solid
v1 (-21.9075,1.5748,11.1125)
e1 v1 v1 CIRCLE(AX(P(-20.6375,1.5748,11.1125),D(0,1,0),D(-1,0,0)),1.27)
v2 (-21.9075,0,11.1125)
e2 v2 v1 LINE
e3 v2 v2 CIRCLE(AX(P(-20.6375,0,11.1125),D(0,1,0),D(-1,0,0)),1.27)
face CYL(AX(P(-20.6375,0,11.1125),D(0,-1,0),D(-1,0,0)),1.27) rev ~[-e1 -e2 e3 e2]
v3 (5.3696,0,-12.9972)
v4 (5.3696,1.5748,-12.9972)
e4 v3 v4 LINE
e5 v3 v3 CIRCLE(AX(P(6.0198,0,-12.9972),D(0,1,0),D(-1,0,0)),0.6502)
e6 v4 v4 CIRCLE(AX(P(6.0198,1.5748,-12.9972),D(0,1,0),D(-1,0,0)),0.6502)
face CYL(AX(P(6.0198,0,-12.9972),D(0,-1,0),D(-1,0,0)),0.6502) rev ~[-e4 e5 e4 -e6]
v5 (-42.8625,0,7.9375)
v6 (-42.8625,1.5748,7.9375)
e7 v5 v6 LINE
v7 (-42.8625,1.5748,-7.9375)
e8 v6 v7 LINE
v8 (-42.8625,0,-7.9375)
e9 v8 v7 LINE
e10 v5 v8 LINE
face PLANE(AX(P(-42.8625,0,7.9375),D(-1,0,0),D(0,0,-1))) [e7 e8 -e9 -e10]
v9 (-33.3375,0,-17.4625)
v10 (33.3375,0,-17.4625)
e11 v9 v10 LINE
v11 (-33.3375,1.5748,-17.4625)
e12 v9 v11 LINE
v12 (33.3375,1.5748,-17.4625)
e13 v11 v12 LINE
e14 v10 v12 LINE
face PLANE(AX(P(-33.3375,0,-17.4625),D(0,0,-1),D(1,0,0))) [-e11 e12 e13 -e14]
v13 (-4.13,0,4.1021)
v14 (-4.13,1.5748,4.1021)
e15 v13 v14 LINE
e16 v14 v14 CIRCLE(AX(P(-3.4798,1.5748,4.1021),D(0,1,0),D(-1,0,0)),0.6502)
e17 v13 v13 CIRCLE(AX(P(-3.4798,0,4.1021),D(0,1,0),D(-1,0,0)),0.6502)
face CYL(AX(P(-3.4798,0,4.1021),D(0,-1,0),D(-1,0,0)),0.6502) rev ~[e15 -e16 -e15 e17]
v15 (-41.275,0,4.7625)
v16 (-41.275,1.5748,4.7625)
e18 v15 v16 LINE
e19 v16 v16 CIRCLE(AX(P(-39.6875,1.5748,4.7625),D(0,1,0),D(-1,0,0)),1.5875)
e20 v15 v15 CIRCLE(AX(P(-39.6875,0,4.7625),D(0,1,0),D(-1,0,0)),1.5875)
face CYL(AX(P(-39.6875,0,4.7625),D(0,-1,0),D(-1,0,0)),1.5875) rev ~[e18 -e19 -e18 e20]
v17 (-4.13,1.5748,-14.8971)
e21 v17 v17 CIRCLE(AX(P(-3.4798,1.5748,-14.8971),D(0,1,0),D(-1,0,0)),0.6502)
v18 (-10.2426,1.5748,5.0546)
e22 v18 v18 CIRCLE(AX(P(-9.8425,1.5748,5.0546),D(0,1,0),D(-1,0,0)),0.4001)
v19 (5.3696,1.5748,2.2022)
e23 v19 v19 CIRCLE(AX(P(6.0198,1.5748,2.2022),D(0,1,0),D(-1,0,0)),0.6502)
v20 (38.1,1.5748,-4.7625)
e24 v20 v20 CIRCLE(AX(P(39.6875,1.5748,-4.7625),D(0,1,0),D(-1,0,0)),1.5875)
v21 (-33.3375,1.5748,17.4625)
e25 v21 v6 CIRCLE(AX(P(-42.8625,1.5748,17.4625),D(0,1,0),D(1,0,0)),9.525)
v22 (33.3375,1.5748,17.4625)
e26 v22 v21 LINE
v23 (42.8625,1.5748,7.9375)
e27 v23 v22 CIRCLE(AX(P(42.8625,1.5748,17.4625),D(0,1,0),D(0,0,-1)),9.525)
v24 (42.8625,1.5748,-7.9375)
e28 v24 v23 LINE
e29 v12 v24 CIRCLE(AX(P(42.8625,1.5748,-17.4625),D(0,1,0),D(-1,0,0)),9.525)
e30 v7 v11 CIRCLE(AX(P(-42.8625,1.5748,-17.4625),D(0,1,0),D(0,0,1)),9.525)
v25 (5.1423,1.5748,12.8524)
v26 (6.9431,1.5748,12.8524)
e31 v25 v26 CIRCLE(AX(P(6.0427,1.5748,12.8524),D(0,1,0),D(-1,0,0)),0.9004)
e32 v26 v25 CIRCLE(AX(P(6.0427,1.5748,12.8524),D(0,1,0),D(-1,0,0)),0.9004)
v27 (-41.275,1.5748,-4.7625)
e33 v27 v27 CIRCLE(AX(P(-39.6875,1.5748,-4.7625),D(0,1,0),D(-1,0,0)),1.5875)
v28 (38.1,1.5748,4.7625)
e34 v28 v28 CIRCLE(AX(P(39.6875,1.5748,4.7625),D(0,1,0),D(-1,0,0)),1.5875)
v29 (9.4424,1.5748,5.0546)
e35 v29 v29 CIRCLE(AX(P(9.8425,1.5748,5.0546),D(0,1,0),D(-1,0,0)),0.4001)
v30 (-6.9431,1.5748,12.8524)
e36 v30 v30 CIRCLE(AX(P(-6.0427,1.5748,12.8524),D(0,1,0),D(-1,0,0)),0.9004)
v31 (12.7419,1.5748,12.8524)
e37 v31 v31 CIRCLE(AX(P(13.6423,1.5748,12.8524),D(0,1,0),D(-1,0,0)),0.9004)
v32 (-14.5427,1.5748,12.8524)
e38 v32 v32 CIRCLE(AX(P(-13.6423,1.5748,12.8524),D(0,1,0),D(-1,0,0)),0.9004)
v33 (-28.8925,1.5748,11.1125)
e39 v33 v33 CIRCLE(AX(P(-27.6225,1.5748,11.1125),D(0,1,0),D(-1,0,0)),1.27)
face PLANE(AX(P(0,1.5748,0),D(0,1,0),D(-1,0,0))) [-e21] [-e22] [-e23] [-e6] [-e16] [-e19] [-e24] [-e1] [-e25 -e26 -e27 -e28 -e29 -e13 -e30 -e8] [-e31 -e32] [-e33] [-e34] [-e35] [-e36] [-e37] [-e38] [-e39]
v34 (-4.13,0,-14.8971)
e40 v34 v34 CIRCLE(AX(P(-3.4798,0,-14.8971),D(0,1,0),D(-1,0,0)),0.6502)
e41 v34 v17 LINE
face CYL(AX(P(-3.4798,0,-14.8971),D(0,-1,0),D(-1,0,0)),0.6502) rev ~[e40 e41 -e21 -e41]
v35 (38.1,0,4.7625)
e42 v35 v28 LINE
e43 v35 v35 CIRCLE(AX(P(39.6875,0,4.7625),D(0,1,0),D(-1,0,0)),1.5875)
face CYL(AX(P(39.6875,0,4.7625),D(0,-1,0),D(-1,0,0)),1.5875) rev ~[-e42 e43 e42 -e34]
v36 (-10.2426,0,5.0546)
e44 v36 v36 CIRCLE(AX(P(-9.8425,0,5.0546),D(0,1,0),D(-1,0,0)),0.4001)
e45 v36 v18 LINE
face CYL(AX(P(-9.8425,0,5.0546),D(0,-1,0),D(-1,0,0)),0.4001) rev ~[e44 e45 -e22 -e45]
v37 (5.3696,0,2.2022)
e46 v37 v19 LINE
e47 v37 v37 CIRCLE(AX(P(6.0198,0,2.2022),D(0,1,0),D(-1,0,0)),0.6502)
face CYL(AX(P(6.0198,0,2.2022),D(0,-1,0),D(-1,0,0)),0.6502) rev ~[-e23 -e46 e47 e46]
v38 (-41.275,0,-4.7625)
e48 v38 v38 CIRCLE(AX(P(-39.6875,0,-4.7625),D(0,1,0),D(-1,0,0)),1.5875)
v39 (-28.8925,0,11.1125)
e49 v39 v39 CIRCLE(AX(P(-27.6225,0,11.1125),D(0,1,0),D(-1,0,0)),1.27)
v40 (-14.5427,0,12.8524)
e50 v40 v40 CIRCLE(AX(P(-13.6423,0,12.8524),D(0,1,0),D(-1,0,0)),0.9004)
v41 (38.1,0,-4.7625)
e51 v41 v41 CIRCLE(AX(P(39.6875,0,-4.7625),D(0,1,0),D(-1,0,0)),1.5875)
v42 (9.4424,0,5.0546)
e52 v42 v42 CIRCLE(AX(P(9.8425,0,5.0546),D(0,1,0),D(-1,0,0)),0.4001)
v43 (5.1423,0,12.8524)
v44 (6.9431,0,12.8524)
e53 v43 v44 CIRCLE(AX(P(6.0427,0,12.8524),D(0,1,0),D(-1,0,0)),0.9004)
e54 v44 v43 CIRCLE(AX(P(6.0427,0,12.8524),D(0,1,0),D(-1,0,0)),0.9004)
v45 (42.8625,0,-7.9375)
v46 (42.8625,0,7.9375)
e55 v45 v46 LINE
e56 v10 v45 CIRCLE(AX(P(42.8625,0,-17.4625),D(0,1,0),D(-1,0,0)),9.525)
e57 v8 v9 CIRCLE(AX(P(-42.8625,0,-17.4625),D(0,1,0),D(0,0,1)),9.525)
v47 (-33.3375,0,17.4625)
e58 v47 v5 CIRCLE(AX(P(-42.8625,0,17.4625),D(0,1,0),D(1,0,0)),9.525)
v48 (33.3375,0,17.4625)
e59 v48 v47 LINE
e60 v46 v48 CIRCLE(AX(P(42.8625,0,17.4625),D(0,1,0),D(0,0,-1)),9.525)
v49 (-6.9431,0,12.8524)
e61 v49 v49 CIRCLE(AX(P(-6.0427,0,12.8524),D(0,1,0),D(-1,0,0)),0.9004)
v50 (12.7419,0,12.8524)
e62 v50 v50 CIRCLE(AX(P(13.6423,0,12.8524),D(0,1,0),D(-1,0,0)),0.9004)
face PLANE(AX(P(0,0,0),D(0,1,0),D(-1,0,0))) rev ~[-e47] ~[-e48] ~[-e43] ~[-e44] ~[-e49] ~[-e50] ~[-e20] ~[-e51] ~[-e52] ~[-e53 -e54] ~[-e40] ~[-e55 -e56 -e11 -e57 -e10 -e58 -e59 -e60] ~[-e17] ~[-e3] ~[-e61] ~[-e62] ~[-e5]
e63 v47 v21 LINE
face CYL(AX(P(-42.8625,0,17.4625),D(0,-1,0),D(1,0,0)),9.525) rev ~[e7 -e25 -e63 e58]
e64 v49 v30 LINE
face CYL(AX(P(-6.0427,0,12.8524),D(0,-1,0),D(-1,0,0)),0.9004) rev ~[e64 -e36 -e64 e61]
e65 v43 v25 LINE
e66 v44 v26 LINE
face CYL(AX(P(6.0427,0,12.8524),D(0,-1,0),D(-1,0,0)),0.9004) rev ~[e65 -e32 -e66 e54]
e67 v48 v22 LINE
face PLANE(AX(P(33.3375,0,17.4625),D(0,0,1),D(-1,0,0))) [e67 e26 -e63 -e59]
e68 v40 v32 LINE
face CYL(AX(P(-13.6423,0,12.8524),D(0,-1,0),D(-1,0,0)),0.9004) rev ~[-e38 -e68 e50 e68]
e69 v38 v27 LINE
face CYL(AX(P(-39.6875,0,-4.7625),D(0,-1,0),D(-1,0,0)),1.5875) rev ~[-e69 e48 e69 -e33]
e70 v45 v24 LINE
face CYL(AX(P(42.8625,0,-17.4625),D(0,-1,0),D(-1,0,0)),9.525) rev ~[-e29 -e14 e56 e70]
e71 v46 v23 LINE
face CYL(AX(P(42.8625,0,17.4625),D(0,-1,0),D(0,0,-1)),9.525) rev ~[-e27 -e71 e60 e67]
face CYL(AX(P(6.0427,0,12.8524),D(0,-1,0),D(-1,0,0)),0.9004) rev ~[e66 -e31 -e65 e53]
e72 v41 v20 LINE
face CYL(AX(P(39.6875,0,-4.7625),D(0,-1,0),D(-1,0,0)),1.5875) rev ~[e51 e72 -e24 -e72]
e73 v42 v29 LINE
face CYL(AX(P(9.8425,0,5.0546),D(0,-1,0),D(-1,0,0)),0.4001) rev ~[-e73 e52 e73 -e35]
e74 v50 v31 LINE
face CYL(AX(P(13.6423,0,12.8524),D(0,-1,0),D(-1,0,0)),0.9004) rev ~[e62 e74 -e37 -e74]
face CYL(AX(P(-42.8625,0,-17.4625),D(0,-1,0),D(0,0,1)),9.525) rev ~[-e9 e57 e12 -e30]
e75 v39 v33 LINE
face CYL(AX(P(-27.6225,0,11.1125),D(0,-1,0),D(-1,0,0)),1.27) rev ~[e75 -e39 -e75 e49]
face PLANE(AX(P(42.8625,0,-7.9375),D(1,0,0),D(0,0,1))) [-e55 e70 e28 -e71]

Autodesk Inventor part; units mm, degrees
ref_plane "YZ Plane" through (0, 0, 0) normal (1, 0, 0) x (0, 1, 0)
ref_plane "XZ Plane" through (0, 0, 0) normal (0, 1, 0) x (-1, 0, 0)
ref_plane "XY Plane" through (0, 0, 0) normal (0, 0, 1) x (1, 0, 0)
sketch "Sketch1" plane through (0, 0, 0) normal (0, 1, 0) x (-1, 0, 0)
  line L0 (-33.3375, 17.4625) -> (33.3375, 17.4625)
  line L1 (42.8625, 7.9375) -> (42.8625, -7.9375)
  line L2 (33.3375, -17.4625) -> (-33.3375, -17.4625)
  line L3 (-42.8625, -7.9375) -> (-42.8625, 7.9375)
  arc A0 (-42.8625, 7.9375) -> (-33.3375, 17.4625) centre (-42.8625, 17.4625) ccw
  arc A1 (-33.3375, -17.4625) -> (-42.8625, -7.9375) centre (-42.8625, -17.4625) ccw
  arc A2 (42.8625, -7.9375) -> (33.3375, -17.4625) centre (42.8625, -17.4625) ccw
  arc A3 (33.3375, 17.4625) -> (42.8625, 7.9375) centre (42.8625, 17.4625) ccw
  circle A4 centre (-39.6875, -4.7625) radius 1.5875
  line L4 (0, 15.213) -> (0, -8.9791)
  circle A5 centre (39.6875, -4.7625) radius 1.5875
  line L5 (-13.6455, 0) -> (11.519, 0)
  circle A6 centre (-39.6875, 4.7625) radius 1.5875
  circle A7 centre (39.6875, 4.7625) radius 1.5875
  line L6 (-42.8625, -13.6689) -> (-42.8625, -17.4625)
  line L7 (-42.8625, -17.4625) -> (-40.918, -17.4625)
  circle A8 centre (6.0427, 12.8524) radius 0.9004
  circle A9 centre (13.6423, 12.8524) radius 0.9004
  circle A10 centre (-6.0427, 12.8524) radius 0.9004
  circle A11 centre (-13.6423, 12.8524) radius 0.9004
  circle A12 centre (20.6375, 11.1125) radius 1.27
  circle A13 centre (27.6225, 11.1125) radius 1.27
  circle A14 centre (-9.8425, 5.0546) radius 0.4001
  circle A15 centre (9.8425, 5.0546) radius 0.4001
  circle A16 centre (3.4798, 4.1021) radius 0.6502
  circle A17 centre (-6.0198, -12.9972) radius 0.6502
  circle A18 centre (-6.0198, 2.2022) radius 0.6502
  circle A19 centre (3.4798, -14.8971) radius 0.6502
  line L8 (-13.6423, 12.8524) -> (-6.0427, 12.8524)
  point P0 (0, 0)
  dimension "d3" = 17.4625
  dimension "d4" = 42.8625
  dimension "d5" = 19.05
  dimension "d6" = 19.05
  dimension "d7" = 19.05
  dimension "d8" = 19.05
  dimension "d9" = 85.725
  dimension "d11" = 85.725
  dimension "d12" = 85.725
  dimension "d13" = 17.4625
  dimension "d14" = 17.4625
  dimension "d15" = 42.8625
  dimension "d19" = 34.925
  dimension "d20" = 42.8625
  dimension "d22" = 17.4625
  dimension "d23" = 42.8625
  dimension "d26" = 39.6875
  dimension "d27" = 3.175
  dimension "d28" = 4.7625
  dimension "d29" = 42.8625
  dimension "d30" = 17.4625
  dimension "d31" = 42.8625
  dimension "d32" = 34.925
  dimension "d33" = 1.8009
  dimension "d34" = 48.9052
  dimension "d35" = 30.3149
  dimension "d36" = 1.8009
  dimension "d37" = 1.8009
  dimension "d38" = 1.8009
  dimension "d39" = 30.3149
  dimension "d40" = 30.3149
  dimension "d41" = 30.3149
  dimension "d42" = 29.2202
  dimension "d43" = 36.8198
  dimension "d45" = 6.0427
  dimension "d46" = 6.0427
  dimension "d47" = 2.54
  dimension "d48" = 2.54
  dimension "d49" = 63.5
  dimension "d50" = 70.485
  dimension "d51" = 28.575
  dimension "d52" = 28.575
  dimension "d53" = 0.8001
  dimension "d54" = 0.8001
  dimension "d55" = 33.02
  dimension "d56" = 52.705
  dimension "d57" = 22.5171
  dimension "d58" = 22.5171
  dimension "d59" = 1.3005
  dimension "d61" = 21.5646
  dimension "d62" = 1.3005
  dimension "d63" = 1.3005
  dimension "d64" = 1.3005
  dimension "d65" = 36.8427
  dimension "d66" = 19.6647
  dimension "d67" = 36.8427
  dimension "d68" = 4.4653
  dimension "d69" = 46.3423
  dimension "d70" = 2.5654
  dimension "d73" = 56.5048
  dimension "d74" = 7.5997
  dimension "d75" = 7.5997
  dimension "d76" = 19.685
  dimension "d77" = 46.3423
extrude "Extrusion2" add sketch "Sketch1" along normal blind 1.5748
properties part number "pcb"
